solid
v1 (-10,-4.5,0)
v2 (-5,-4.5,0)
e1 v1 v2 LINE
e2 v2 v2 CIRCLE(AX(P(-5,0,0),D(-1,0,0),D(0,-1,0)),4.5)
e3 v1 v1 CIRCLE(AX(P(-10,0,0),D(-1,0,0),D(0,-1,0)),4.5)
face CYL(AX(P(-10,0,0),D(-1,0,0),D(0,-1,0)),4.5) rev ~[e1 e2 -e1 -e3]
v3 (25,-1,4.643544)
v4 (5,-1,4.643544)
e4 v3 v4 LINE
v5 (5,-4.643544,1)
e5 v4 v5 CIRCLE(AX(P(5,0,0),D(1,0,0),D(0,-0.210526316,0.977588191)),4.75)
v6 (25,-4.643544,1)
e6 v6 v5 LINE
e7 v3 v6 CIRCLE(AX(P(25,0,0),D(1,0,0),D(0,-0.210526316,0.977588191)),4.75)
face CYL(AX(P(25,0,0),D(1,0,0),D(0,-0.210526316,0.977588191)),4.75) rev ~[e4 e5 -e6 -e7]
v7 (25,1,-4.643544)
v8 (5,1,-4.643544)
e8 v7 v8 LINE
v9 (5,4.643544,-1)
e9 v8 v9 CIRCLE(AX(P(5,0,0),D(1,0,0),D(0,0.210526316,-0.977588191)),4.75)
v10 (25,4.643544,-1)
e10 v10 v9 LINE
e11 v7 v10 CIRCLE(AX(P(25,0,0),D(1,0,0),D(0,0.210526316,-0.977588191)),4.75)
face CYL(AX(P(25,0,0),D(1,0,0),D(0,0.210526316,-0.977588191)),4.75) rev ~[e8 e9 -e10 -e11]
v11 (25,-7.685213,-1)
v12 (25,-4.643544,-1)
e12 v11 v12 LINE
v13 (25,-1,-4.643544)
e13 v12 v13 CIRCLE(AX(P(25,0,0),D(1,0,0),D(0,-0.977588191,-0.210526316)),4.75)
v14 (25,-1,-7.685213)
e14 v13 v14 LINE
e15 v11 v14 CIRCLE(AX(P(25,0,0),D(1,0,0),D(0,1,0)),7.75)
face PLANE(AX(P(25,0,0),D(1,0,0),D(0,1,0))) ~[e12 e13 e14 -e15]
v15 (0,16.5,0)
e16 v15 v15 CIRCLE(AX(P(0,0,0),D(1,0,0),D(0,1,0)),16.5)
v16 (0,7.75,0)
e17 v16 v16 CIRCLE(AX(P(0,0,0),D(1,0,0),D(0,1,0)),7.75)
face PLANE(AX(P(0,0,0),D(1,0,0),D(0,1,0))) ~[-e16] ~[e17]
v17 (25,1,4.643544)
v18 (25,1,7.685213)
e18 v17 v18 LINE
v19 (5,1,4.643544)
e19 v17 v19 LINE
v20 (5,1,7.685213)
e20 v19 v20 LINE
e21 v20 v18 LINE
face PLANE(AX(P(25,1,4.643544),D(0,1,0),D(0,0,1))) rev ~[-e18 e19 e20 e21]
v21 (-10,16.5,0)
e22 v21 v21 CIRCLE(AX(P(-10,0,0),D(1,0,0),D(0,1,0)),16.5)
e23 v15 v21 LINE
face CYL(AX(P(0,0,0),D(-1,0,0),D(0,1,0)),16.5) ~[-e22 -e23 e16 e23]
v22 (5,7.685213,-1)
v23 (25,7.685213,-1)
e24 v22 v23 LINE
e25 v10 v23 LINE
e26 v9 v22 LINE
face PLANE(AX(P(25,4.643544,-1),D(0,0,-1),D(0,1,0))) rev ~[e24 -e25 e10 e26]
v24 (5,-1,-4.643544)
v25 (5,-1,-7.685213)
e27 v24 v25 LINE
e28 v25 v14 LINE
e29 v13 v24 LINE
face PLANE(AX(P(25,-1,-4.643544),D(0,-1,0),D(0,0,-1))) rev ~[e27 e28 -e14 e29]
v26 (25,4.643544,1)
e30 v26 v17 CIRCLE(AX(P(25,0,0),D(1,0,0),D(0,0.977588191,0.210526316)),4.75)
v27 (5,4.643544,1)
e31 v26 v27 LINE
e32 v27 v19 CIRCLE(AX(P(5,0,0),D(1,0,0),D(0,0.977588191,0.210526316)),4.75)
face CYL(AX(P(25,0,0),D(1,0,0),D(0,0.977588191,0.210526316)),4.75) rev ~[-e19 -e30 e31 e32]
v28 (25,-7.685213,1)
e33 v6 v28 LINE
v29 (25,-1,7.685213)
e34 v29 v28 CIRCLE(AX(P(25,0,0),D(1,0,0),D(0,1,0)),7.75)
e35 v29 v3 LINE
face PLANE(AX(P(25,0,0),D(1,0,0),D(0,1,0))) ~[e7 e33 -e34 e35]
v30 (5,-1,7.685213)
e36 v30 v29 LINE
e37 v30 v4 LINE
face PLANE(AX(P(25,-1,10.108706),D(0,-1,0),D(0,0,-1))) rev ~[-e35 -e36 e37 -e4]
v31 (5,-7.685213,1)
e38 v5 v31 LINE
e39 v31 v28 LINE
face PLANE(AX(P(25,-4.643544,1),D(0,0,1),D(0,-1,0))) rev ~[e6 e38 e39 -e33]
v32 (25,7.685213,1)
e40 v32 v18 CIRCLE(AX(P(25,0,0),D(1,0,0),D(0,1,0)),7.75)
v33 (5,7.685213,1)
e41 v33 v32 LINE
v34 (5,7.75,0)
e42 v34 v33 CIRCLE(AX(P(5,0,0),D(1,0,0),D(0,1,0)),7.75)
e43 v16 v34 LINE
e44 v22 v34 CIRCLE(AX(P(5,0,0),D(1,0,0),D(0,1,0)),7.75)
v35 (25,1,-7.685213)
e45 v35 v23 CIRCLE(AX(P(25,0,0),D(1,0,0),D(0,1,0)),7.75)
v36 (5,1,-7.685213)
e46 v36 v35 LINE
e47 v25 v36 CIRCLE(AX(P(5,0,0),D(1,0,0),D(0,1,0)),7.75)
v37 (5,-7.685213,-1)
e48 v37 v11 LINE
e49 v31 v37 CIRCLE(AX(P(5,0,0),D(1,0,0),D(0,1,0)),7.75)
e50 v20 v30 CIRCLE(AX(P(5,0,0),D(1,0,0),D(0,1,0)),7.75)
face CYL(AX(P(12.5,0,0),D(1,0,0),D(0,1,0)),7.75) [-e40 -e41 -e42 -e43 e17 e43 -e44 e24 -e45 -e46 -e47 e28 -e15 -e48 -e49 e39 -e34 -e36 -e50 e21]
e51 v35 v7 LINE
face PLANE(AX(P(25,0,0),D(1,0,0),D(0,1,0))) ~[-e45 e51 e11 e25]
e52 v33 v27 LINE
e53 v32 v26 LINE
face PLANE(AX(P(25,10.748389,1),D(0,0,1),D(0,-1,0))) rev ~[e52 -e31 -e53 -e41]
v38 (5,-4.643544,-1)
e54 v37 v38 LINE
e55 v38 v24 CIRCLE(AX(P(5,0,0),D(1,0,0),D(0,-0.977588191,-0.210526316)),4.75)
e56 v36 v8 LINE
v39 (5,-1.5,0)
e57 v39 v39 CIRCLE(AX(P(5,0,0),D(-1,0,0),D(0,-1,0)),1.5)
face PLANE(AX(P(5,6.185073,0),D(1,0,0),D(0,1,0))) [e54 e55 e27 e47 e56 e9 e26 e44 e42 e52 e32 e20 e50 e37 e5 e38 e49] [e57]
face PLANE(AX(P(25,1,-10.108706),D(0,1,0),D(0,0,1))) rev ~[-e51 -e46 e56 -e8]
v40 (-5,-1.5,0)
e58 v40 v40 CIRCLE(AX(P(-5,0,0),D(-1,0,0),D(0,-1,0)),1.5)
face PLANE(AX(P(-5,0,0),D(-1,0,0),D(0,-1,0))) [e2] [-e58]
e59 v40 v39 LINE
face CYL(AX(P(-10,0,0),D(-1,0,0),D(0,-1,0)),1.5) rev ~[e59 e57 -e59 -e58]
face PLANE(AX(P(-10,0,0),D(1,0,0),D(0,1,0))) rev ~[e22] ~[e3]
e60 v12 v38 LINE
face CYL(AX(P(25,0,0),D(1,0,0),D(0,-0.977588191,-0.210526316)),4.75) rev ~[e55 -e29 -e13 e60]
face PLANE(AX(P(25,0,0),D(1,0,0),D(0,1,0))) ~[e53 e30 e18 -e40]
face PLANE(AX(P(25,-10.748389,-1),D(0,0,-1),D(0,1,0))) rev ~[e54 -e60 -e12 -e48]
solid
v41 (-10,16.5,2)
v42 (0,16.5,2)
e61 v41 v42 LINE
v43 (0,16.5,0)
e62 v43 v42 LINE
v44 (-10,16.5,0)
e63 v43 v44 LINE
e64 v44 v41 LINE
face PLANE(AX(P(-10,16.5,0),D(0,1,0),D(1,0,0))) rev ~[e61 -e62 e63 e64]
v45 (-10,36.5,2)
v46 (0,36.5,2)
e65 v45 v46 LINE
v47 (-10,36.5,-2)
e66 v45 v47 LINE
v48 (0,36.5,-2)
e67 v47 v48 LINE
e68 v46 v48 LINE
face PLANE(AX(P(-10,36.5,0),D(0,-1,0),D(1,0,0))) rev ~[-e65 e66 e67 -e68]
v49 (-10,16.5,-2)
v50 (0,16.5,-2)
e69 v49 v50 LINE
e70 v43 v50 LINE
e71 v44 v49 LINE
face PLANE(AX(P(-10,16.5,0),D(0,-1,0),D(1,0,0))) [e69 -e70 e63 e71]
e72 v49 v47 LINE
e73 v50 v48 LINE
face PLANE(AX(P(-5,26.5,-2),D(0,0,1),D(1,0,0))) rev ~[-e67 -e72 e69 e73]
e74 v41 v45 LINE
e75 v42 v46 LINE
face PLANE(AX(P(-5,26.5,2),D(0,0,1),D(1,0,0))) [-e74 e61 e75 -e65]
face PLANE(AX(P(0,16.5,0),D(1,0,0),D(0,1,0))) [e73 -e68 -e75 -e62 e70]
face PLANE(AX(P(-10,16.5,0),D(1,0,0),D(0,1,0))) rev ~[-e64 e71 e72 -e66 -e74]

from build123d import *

# Parameters (mm, degrees)
F0_W     = 25
F0_H     = 7.75
F2_W     = 2
F2_H     = 2
F3_DEPTH = 20
F4_R     = 4.5
F4_R_2   = 1.5
F5_DEPTH = 5
F6_DEPTH = 25
F7_W     = 10
F7_H     = 20
F8_DEPTH = 2
F9_DEPTH = 2


# Not quite as in the source:
# - a feature names something its author has since deleted; it is built from what else it names


with BuildPart() as f1:
    # F0 (on Top) → F1 (revolve)
    with BuildSketch(Plane.XY):
        Polygon((-10, 0), (0, 0), (0, 7.75), (0, 16.5), (-10, 16.5), align=None)
        with Locations((12.5, 3.875)):
            Rectangle(F0_W, F0_H)
    revolve(axis=Axis((12.5, 0, 0), (1, 0, 0)))

    # F2 (on face) → F3 (cut)
    with BuildSketch(Plane.YZ.offset(25)):
        with BuildLine():
            ThreePointArc((4.6435439053, 1), (4.7233109971, 0.502825243), (4.75, 0))
            ThreePointArc((4.75, 0), (4.7233109971, -0.502825243), (4.6435439053, -1))
            Line((4.6435439053, -1), (7.6852130745, -1))
            ThreePointArc((7.6852130745, -1), (7.7337863084, -0.5010482376), (7.75, 0))
            ThreePointArc((7.75, 0), (7.7337863084, 0.5010482376), (7.6852130745, 1))
            Line((7.6852130745, 1), (4.6435439053, 1))
        make_face()
        with BuildLine():
            Line((10.7483885819, 1), (7.6852130745, 1))
            ThreePointArc((7.6852130745, 1), (7.7337863084, 0.5010482376), (7.75, 0))
            ThreePointArc((7.75, 0), (7.7337863084, -0.5010482376), (7.6852130745, -1))
            Line((7.6852130745, -1), (10.7483885819, -1))
            Line((10.7483885819, -1), (10.7483885819, 1))
        make_face()
        with BuildLine():
            ThreePointArc((4.6435439053, -1), (4.7233109971, -0.502825243), (4.75, 0))
            ThreePointArc((4.75, 0), (4.7233109971, 0.502825243), (4.6435439053, 1))
            Line((4.6435439053, 1), (1, 1))
            Line((1, 1), (1, -1))
            Line((1, -1), (4.6435439053, -1))
        make_face()
        with BuildLine():
            Line((1, 1), (1, 4.6435439053))
            ThreePointArc((1, 4.6435439053), (0, 4.75), (-1, 4.6435439053))
            Line((-1, 4.6435439053), (-1, 1))
            Line((-1, 1), (1, 1))
        make_face()
        with BuildLine():
            ThreePointArc((-1, 4.6435439053), (0, 4.75), (1, 4.6435439053))
            Line((1, 4.6435439053), (1, 7.6852130745))
            ThreePointArc((1, 7.6852130745), (0, 7.75), (-1, 7.6852130745))
            Line((-1, 7.6852130745), (-1, 4.6435439053))
        make_face()
        with BuildLine():
            ThreePointArc((-1, 7.6852130745), (0, 7.75), (1, 7.6852130745))
            Line((1, 7.6852130745), (1, 10.1087059955))
            Line((1, 10.1087059955), (-1, 10.1087059955))
            Line((-1, 10.1087059955), (-1, 7.6852130745))
        make_face()
        Rectangle(F2_W, F2_H)
        with BuildLine():
            ThreePointArc((-1, -4.6435439053), (0, -4.75), (1, -4.6435439053))
            Line((1, -4.6435439053), (1, -1))
            Line((1, -1), (-1, -1))
            Line((-1, -1), (-1, -4.6435439053))
        make_face()
        with BuildLine():
            Line((1, -7.6852130745), (1, -4.6435439053))
            ThreePointArc((1, -4.6435439053), (0, -4.75), (-1, -4.6435439053))
            Line((-1, -4.6435439053), (-1, -7.6852130745))
            ThreePointArc((-1, -7.6852130745), (0, -7.75), (1, -7.6852130745))
        make_face()
        with BuildLine():
            Line((1, -10.1087059955), (1, -7.6852130745))
            ThreePointArc((1, -7.6852130745), (0, -7.75), (-1, -7.6852130745))
            Line((-1, -7.6852130745), (-1, -10.1087059955))
            Line((-1, -10.1087059955), (1, -10.1087059955))
        make_face()
        with BuildLine():
            Line((-1, -1), (-1, 1))
            Line((-1, 1), (-4.6435439053, 1))
            ThreePointArc((-4.6435439053, 1), (-4.75, 0), (-4.6435439053, -1))
            Line((-4.6435439053, -1), (-1, -1))
        make_face()
        with BuildLine():
            ThreePointArc((-4.6435439053, -1), (-4.75, 0), (-4.6435439053, 1))
            Line((-4.6435439053, 1), (-7.6852130745, 1))
            ThreePointArc((-7.6852130745, 1), (-7.75, 0), (-7.6852130745, -1))
            Line((-7.6852130745, -1), (-4.6435439053, -1))
        make_face()
        with BuildLine():
            ThreePointArc((-7.6852130745, -1), (-7.75, 0), (-7.6852130745, 1))
            Line((-7.6852130745, 1), (-10.7483885819, 1))
            Line((-10.7483885819, 1), (-10.7483885819, -1))
            Line((-10.7483885819, -1), (-7.6852130745, -1))
        make_face()
        with BuildLine():
            Line((-1, 1), (-1, 4.6435439053))
            ThreePointArc((-1, 4.6435439053), (-3.3587572106, 3.3587572106), (-4.6435439053, 1))
            Line((-4.6435439053, 1), (-1, 1))
        make_face()
        with BuildLine():
            ThreePointArc((-4.6435439053, -1), (-3.3587572106, -3.3587572106), (-1, -4.6435439053))
            Line((-1, -4.6435439053), (-1, -1))
            Line((-1, -1), (-4.6435439053, -1))
        make_face()
        with BuildLine():
            ThreePointArc((1, -4.6435439053), (3.3587572106, -3.3587572106), (4.6435439053, -1))
            Line((4.6435439053, -1), (1, -1))
            Line((1, -1), (1, -4.6435439053))
        make_face()
        with BuildLine():
            Line((1, 1), (4.6435439053, 1))
            ThreePointArc((4.6435439053, 1), (3.3587572106, 3.3587572106), (1, 4.6435439053))
            Line((1, 4.6435439053), (1, 1))
        make_face()
    extrude(amount=-F3_DEPTH, mode=Mode.SUBTRACT)

    # F4 (on face) → F5 (cut)
    with BuildSketch(Plane(origin=(-10, 0, 0), x_dir=(0, -1, 0), z_dir=(-1, 0, 0))):
        Circle(F4_R)
        Circle(F4_R_2, mode=Mode.SUBTRACT)
    extrude(amount=-F5_DEPTH, mode=Mode.SUBTRACT)

    # F6 (cut): a face of the model
    f6_faces = [f1.faces().sort_by_distance(p)[0] for p in [
        (-10, 0, 0),
    ]]
    extrude(f6_faces, amount=-F6_DEPTH, mode=Mode.SUBTRACT)

    # F7 (on Top) → F8 (join)
    with BuildSketch(Plane.XY):
        with Locations((-5, 26.5)):
            Rectangle(F7_W, F7_H)
    extrude(amount=F8_DEPTH)

    # F7 (on Top) → F9 (join)
    with BuildSketch(Plane.XY):
        with Locations((-5, 26.5)):
            Rectangle(F7_W, F7_H)
    extrude(amount=-F9_DEPTH)


solid = f1.part
